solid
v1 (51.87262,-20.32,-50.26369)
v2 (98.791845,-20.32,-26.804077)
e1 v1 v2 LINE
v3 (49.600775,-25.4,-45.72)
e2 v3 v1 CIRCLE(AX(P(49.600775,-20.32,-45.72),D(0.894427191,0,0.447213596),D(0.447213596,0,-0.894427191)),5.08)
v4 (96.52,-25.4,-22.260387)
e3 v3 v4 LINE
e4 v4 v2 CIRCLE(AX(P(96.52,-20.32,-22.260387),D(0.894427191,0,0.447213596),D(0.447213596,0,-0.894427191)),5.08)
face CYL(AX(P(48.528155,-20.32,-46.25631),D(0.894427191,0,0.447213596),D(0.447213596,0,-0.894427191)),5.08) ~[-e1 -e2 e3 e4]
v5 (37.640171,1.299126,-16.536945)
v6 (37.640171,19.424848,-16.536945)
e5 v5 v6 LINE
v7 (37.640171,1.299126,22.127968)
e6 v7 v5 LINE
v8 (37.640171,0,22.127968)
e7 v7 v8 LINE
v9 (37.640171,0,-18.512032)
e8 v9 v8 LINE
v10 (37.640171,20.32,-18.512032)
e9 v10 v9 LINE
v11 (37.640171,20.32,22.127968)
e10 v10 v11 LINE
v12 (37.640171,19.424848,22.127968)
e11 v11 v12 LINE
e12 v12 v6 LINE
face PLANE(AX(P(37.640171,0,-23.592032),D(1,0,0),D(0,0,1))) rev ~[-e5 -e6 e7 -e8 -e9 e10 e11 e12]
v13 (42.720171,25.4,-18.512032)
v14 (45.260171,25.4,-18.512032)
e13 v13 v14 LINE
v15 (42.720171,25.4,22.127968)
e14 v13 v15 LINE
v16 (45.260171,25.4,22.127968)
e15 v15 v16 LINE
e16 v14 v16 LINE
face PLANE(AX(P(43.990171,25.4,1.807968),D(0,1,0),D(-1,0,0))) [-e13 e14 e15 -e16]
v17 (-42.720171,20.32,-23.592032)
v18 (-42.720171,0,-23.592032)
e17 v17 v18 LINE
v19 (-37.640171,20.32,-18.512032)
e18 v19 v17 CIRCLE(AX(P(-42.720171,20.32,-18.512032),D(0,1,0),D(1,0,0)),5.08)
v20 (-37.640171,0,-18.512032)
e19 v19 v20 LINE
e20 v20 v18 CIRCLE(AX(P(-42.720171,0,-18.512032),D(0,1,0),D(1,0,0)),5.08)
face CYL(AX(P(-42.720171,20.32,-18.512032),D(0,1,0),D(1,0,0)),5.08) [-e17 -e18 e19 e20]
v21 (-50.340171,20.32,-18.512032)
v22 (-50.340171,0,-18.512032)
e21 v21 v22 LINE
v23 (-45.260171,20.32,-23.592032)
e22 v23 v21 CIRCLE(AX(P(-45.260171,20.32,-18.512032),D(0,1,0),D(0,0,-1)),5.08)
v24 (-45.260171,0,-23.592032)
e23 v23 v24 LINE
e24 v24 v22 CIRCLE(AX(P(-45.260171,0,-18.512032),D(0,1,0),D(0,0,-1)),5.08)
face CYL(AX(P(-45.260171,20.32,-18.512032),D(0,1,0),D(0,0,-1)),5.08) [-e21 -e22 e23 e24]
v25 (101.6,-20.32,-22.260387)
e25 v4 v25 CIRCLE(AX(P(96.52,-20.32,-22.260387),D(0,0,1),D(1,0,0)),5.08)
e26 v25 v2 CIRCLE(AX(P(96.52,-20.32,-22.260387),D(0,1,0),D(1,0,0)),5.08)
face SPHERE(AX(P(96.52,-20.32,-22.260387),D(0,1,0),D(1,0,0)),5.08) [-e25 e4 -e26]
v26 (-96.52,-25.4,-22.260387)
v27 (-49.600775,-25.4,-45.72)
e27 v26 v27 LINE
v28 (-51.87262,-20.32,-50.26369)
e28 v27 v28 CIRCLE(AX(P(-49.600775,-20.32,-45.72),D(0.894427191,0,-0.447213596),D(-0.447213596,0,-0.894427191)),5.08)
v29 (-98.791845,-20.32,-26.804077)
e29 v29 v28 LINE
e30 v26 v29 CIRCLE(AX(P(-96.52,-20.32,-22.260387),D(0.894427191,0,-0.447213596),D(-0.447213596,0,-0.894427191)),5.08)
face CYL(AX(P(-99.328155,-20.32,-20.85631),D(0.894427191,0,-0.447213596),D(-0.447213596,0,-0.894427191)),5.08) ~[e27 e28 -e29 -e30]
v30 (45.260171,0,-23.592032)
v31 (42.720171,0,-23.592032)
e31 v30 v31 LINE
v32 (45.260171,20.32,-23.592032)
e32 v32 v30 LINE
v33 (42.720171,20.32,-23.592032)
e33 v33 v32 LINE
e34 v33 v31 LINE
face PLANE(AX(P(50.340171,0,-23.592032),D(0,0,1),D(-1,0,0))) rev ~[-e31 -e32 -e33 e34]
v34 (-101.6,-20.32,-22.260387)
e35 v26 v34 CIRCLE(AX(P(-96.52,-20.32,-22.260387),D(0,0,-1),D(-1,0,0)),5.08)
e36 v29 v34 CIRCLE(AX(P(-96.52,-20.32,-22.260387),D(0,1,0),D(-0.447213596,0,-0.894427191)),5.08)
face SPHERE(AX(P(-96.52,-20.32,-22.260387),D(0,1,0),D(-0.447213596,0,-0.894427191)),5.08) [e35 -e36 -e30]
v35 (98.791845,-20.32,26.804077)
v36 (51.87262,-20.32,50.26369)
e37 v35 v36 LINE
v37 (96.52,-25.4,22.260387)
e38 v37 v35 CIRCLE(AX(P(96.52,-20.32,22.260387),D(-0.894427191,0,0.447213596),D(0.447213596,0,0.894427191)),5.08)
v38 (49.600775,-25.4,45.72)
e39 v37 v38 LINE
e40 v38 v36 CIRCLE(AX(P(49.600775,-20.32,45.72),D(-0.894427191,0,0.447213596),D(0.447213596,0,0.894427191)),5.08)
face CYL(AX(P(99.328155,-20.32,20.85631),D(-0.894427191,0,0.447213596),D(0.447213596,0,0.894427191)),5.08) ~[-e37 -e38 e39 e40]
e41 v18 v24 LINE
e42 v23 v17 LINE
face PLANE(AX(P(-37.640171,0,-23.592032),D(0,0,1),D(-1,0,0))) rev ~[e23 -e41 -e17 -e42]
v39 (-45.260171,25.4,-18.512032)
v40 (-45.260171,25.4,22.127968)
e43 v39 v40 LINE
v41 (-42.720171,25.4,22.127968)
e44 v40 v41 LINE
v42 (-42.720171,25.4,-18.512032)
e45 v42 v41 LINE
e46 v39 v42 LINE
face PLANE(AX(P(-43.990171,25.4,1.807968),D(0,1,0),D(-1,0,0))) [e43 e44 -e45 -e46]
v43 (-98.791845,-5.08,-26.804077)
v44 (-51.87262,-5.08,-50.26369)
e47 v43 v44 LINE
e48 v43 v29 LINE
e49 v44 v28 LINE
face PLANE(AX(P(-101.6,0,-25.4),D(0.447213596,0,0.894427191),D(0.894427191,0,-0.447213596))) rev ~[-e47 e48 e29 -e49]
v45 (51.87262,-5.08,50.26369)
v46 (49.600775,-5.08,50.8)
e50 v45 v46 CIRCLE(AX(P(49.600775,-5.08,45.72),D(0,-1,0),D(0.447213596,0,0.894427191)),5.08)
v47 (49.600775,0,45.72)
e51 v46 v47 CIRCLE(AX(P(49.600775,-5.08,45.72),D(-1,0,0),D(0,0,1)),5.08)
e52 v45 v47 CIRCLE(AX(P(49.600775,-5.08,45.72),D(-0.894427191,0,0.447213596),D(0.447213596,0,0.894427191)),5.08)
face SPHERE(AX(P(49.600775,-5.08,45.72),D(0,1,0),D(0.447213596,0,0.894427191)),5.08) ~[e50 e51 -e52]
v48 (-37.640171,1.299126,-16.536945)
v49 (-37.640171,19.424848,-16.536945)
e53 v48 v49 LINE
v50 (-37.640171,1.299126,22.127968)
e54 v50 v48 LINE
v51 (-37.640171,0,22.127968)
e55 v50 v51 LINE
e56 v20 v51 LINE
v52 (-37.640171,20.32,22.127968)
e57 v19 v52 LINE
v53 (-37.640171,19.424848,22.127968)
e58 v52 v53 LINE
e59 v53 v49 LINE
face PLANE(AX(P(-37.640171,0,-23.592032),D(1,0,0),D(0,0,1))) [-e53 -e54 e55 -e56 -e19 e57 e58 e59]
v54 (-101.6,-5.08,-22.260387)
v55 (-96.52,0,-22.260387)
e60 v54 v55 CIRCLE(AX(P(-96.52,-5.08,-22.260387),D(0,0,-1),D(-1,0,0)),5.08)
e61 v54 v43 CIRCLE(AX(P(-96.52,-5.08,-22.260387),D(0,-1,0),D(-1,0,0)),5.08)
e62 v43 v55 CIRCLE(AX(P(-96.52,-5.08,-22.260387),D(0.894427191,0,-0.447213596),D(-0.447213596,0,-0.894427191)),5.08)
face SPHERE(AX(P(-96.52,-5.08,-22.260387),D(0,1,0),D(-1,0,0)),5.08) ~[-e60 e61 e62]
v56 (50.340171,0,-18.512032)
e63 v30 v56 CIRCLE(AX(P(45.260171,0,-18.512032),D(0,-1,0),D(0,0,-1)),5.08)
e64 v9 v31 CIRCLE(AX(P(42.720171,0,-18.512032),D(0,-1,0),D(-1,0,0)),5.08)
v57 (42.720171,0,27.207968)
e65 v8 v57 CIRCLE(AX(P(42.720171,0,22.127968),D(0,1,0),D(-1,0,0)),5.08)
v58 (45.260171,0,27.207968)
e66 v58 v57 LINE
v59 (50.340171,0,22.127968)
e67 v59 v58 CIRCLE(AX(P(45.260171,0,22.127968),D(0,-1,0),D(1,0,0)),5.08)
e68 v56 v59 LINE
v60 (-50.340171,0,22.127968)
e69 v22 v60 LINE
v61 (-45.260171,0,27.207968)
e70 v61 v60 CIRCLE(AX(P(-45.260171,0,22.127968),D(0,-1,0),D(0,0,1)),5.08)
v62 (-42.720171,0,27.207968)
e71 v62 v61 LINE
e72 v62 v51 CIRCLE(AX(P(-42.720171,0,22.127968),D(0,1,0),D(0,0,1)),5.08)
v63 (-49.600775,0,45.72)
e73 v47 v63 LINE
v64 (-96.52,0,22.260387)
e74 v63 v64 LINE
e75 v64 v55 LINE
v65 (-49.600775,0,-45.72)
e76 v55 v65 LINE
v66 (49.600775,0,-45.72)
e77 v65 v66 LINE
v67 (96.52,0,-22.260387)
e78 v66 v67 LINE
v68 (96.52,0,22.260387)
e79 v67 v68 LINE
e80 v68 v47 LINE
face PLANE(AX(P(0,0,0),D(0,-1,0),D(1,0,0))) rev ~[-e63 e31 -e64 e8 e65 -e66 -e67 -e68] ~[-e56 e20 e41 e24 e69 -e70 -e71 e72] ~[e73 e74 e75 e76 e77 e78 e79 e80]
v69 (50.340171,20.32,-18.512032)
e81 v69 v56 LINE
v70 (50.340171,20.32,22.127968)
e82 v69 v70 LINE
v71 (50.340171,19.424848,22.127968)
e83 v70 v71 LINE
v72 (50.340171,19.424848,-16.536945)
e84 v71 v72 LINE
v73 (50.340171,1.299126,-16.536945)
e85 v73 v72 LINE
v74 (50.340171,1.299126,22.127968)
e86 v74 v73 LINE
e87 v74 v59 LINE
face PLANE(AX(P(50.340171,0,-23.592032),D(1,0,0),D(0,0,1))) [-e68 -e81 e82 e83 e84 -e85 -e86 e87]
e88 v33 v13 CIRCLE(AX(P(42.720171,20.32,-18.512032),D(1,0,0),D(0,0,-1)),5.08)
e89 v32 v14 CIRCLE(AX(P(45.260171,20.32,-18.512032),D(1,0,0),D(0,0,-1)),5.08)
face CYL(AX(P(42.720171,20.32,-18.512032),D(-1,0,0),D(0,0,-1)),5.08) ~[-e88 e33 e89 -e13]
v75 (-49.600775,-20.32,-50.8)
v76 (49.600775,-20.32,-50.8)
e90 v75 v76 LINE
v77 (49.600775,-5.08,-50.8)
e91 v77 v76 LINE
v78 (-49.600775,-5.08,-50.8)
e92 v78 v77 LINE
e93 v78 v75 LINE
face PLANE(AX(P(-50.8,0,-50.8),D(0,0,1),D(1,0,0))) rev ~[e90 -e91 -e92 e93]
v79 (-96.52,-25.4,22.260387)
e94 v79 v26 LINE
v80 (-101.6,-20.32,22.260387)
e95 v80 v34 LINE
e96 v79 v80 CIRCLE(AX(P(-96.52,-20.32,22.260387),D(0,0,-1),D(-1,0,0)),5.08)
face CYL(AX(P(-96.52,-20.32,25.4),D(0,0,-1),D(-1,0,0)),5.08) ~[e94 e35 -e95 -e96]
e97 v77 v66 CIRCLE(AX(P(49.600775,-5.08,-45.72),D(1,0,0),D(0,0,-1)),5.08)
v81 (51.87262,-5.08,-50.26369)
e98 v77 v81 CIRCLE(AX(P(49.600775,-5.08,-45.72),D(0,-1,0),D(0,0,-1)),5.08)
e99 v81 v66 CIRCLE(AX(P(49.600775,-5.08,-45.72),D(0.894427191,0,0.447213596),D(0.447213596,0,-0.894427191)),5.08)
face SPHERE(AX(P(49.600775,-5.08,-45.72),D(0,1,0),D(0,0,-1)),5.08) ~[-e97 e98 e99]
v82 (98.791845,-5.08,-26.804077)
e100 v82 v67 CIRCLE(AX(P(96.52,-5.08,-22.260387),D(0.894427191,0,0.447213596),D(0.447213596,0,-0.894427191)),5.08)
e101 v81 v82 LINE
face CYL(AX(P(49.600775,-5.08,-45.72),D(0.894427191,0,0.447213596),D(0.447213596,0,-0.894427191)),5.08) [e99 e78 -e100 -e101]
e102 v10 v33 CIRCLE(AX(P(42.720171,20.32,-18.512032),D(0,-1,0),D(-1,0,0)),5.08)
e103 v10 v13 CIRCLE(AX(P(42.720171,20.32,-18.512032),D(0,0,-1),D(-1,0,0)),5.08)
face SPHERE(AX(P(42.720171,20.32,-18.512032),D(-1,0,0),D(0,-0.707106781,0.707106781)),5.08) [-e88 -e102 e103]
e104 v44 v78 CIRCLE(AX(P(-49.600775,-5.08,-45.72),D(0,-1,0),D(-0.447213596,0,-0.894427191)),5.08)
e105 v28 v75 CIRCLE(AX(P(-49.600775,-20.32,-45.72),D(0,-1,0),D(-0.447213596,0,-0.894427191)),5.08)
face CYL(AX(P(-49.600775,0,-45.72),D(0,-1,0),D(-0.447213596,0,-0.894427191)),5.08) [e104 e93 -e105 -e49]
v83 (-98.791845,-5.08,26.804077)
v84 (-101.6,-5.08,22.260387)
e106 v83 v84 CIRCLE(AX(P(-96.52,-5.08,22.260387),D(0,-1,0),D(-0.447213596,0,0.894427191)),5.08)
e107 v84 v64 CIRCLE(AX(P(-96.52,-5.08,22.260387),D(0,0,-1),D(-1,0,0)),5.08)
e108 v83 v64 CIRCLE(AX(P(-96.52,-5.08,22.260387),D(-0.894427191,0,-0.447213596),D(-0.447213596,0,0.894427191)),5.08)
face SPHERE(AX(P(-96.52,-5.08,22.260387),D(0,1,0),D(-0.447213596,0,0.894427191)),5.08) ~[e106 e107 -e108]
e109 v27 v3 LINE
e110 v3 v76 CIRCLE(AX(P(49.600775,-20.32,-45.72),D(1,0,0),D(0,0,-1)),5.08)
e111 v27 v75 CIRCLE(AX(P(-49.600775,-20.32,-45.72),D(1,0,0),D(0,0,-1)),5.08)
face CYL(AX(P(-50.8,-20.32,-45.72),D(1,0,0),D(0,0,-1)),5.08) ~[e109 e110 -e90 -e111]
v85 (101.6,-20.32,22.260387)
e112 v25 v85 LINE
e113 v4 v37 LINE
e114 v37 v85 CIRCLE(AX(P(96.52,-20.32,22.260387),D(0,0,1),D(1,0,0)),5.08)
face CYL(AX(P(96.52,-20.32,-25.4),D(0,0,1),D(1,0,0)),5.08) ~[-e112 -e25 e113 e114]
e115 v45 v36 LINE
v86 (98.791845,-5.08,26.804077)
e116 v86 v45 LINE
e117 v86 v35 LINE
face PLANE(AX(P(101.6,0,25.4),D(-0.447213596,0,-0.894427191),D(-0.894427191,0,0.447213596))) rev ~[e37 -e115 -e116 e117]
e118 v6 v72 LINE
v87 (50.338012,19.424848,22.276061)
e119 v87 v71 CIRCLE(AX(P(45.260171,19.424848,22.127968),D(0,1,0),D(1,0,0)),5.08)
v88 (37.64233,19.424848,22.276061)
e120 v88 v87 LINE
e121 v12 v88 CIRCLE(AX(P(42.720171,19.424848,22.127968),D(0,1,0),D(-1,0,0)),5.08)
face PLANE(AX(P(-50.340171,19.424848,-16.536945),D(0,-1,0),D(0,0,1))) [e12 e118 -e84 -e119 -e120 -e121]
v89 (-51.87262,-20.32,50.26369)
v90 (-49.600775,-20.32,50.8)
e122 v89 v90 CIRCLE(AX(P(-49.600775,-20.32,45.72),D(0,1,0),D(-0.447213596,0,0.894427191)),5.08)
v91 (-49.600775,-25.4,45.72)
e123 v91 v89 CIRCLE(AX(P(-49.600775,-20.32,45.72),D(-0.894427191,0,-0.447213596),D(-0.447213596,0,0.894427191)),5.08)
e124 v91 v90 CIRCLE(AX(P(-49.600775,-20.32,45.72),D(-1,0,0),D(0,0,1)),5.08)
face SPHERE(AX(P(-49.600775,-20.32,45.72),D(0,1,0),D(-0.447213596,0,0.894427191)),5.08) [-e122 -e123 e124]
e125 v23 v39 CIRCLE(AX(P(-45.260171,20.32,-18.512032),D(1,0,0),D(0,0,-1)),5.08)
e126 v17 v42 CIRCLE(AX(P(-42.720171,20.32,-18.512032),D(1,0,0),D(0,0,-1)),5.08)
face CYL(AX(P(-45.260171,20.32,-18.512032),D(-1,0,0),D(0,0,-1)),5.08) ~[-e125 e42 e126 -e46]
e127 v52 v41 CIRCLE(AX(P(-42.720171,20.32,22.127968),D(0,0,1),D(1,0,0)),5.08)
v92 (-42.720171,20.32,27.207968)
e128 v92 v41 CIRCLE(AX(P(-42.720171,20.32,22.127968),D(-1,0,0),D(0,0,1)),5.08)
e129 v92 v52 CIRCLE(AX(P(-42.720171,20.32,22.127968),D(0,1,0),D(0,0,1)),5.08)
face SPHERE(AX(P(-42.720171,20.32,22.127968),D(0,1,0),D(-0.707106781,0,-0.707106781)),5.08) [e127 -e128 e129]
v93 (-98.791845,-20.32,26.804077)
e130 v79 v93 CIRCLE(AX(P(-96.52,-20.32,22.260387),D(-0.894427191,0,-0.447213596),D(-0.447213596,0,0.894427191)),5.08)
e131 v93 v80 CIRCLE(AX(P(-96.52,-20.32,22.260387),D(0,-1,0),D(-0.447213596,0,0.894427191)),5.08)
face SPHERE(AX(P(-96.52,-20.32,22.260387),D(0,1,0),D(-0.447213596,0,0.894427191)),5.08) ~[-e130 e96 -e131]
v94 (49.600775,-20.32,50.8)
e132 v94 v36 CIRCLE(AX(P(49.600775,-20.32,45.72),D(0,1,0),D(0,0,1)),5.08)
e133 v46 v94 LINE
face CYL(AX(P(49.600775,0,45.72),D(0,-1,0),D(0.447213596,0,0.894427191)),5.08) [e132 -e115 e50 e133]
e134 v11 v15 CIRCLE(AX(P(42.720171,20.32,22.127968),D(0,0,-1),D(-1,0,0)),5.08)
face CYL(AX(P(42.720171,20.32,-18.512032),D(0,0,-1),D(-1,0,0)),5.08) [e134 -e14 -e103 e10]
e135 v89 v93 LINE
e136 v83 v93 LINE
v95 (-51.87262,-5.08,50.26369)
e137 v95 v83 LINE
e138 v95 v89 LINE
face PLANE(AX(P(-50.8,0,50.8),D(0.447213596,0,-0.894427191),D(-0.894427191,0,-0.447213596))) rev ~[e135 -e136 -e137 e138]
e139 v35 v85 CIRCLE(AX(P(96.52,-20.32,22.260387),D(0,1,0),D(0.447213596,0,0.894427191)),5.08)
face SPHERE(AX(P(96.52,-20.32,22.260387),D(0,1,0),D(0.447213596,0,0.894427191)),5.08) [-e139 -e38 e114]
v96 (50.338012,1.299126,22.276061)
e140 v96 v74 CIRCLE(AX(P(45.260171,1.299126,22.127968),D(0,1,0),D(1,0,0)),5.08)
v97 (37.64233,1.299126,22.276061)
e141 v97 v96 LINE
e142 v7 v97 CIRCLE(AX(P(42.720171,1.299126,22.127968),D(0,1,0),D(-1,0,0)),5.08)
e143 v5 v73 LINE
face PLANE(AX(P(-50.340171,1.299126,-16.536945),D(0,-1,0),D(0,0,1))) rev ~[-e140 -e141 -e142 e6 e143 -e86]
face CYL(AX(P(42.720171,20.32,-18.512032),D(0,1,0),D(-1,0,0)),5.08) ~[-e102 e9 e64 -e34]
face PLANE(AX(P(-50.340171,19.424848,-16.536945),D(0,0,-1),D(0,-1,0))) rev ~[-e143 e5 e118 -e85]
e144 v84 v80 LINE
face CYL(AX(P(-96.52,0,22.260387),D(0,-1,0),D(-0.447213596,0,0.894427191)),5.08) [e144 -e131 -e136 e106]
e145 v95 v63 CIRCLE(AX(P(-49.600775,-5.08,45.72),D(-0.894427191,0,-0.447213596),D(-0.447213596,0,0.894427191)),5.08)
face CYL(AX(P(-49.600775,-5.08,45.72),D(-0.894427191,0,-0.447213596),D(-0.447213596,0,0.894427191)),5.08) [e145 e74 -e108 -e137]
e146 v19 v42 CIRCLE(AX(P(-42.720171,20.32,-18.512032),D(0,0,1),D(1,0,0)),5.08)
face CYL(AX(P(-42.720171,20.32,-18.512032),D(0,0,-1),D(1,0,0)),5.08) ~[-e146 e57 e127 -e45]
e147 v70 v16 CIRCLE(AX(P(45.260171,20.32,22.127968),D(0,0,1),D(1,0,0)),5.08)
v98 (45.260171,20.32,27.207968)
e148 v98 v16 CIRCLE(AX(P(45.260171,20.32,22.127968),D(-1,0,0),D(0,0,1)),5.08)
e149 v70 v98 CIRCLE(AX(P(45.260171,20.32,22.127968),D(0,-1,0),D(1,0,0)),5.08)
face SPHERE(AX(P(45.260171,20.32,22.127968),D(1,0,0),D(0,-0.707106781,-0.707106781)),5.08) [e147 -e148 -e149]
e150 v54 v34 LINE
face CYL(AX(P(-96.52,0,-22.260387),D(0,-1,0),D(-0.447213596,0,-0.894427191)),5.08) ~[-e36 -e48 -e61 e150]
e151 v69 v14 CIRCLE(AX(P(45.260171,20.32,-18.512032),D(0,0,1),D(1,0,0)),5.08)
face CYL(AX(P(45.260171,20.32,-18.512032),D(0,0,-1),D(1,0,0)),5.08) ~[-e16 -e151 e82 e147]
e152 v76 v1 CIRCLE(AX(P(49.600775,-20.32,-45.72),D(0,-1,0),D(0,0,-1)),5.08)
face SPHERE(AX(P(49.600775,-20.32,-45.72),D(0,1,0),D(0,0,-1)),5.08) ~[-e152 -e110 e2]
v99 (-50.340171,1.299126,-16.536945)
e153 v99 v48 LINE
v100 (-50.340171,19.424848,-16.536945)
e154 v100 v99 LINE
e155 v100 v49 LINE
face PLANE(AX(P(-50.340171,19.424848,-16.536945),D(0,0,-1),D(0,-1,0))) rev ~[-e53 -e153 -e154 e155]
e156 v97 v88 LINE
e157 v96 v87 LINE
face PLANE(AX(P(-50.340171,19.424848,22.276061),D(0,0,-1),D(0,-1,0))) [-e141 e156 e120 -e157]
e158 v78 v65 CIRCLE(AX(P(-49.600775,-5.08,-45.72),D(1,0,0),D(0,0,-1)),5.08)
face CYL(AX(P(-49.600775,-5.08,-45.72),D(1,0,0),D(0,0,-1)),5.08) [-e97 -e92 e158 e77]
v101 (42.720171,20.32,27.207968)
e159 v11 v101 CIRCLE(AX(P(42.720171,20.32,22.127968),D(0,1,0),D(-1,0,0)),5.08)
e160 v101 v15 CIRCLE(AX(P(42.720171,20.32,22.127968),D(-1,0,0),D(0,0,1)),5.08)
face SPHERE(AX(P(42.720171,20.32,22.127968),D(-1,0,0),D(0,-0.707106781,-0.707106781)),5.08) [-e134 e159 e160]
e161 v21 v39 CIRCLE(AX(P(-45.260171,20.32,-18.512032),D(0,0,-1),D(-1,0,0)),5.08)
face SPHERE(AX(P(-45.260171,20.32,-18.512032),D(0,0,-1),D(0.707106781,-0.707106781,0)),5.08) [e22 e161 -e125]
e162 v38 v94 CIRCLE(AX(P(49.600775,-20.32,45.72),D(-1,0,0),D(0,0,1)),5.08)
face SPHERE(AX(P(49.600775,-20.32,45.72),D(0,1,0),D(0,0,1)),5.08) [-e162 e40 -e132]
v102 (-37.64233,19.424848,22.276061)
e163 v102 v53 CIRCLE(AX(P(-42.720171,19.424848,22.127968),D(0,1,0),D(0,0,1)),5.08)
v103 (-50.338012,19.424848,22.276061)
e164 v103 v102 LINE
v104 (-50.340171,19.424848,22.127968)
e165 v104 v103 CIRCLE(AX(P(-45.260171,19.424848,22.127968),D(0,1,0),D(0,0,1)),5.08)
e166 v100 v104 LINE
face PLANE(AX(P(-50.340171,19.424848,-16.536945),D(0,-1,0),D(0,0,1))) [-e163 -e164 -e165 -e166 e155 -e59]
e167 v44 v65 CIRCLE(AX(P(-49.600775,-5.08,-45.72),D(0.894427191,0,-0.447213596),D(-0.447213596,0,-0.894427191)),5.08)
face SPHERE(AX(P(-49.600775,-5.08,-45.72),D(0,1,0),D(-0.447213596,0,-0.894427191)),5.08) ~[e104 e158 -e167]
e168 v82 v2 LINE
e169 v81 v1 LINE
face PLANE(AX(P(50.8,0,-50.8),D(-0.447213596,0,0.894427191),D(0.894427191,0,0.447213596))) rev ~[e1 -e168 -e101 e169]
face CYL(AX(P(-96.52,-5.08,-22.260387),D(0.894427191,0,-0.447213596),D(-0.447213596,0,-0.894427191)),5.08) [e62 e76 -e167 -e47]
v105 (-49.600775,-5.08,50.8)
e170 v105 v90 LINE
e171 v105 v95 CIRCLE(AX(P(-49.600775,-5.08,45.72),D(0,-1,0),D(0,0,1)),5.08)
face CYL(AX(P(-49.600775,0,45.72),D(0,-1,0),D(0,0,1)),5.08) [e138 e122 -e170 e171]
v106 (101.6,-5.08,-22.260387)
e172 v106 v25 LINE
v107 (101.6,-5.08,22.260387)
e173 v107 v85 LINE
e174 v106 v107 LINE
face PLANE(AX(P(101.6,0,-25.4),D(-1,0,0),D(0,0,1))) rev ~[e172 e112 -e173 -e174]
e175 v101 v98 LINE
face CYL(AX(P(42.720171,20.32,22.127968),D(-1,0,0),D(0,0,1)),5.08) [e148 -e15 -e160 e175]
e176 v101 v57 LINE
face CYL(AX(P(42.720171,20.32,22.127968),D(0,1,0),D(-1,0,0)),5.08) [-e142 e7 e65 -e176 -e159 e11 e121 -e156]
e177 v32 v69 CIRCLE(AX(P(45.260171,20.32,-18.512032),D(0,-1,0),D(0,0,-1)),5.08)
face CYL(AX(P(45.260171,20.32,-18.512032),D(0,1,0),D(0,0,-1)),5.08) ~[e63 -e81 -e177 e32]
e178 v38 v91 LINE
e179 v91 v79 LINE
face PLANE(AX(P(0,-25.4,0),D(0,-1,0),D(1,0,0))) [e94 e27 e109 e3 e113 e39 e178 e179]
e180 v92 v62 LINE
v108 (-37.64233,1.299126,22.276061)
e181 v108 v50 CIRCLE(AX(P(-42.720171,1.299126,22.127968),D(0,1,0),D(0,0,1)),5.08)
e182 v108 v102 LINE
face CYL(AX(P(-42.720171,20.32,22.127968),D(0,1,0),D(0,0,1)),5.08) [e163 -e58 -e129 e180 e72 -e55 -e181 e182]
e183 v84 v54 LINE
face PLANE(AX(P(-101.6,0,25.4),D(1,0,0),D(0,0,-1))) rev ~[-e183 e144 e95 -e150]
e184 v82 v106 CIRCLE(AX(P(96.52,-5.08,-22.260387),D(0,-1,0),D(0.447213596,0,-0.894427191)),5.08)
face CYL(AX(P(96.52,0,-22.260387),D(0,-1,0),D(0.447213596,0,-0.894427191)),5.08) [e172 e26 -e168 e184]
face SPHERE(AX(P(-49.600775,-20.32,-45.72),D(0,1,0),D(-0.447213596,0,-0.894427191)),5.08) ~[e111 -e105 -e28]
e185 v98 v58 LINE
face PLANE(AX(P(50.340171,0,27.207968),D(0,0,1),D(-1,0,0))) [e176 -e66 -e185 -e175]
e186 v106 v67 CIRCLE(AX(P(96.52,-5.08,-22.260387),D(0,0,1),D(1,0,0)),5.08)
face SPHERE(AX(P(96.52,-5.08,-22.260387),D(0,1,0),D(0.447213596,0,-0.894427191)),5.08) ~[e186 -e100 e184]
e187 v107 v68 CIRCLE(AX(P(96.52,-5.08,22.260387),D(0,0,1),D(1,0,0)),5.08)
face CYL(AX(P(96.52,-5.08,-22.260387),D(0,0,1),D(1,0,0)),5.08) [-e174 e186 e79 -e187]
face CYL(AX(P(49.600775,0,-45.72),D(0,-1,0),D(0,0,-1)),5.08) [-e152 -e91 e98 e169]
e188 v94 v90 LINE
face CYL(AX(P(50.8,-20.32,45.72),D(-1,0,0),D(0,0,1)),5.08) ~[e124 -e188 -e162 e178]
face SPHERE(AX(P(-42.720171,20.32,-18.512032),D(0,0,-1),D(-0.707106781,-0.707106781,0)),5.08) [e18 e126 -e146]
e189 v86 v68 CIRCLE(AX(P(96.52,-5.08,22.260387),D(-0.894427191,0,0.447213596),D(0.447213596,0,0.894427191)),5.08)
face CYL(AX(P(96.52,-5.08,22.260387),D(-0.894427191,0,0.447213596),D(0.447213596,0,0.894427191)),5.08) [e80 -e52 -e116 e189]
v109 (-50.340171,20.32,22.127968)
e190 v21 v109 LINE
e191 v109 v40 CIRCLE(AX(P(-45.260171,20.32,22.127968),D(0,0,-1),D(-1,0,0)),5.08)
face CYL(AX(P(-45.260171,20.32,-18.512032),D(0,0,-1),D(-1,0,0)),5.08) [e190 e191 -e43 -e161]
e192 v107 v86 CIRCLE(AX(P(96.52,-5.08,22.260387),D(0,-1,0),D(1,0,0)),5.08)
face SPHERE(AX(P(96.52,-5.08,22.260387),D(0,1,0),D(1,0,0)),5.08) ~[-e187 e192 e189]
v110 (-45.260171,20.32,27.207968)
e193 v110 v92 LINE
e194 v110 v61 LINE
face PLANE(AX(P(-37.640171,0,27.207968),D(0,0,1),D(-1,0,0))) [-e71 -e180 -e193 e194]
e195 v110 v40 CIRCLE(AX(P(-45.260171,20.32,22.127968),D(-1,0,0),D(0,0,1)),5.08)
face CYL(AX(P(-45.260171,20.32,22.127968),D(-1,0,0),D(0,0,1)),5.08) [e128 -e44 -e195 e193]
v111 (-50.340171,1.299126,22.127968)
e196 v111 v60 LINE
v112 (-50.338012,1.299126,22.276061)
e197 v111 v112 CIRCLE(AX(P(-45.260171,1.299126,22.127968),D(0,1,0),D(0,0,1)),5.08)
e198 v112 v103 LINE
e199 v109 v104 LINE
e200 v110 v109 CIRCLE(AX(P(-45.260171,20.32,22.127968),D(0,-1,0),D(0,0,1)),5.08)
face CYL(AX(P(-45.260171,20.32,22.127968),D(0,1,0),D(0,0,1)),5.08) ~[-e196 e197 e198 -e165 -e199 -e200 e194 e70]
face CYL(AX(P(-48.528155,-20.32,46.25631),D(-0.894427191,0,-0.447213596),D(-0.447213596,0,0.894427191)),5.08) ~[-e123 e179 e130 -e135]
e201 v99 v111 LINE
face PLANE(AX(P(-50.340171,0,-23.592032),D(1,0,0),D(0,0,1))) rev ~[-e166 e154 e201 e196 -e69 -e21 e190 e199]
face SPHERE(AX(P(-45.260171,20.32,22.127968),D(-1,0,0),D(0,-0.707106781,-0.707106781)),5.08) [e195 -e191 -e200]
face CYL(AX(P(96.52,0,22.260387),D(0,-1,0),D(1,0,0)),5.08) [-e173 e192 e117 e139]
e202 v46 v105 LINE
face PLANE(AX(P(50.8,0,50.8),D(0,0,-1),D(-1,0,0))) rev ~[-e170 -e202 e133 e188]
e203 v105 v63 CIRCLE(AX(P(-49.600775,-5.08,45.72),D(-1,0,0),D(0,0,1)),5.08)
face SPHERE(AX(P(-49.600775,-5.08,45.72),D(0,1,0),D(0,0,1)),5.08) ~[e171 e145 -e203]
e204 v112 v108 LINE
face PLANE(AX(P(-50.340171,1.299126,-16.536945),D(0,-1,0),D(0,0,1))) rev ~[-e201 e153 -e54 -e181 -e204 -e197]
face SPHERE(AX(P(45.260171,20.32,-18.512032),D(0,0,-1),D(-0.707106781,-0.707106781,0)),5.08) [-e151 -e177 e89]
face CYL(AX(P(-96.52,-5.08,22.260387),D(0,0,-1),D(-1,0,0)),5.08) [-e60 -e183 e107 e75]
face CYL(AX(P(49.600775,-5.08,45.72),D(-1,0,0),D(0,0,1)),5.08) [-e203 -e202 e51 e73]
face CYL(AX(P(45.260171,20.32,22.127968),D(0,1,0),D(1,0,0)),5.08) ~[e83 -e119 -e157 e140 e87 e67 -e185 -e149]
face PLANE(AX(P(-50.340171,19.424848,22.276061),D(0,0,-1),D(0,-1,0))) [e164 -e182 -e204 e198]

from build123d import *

# Parameters (mm, degrees)
F1_DEPTH     = 25.4
F2_R         = 5.08
F3_R         = 5.08
F4_W         = 12.7
F4_H         = 50.8
F5_DEPTH     = 25.4
F6_W         = 18.1257220684
F6_H         = 38.8130061328
F7_DEPTH     = 254
F8_T1_DEPTH  = 2.54
F8_T3_DEPTH  = 40.64
F8_T5_DEPTH  = 20.32
F8_S9_W      = 5.08
F8_S9_H      = 5.08
F8_T10_DEPTH = 5.08
F8_S15_W     = 5.08
F8_S15_H     = 5.08
F8_T16_DEPTH = 5.08
F8_S21_W     = 5.08
F8_S21_H     = 5.08
F8_T22_DEPTH = 5.08
F8_S27_W     = 5.08
F8_S27_H     = 5.08
F8_T28_DEPTH = 5.08
F9_T1_DEPTH  = 40.64
F9_T3_DEPTH  = 2.54
F9_T5_DEPTH  = 20.32
F9_S9_W      = 5.08
F9_S9_H      = 5.08
F9_T10_DEPTH = 5.08
F9_S15_W     = 5.08
F9_S15_H     = 5.08
F9_T16_DEPTH = 5.08
F9_S21_W     = 5.08
F9_S21_H     = 5.08
F9_T22_DEPTH = 5.08
F9_S27_W     = 5.08
F9_S27_H     = 5.08
F9_T28_DEPTH = 5.08


# Not quite as in the source:
# - a fillet or chamfer that OpenCascade refuses, or shapes differently, is made with other operations: its cross-section is extruded or revolved along the edge and cut away or added


with BuildPart() as f1:
    # F0 (on Front) → F1 (new body)
    with BuildSketch(Plane.XZ):
        Polygon((-101.6, -25.4), (-50.8, -50.8), (50.8, -50.8), (101.6, -25.4), (101.6, 25.4), (50.8, 50.8), (-50.8, 50.8), (-101.6, 25.4), align=None)
    extrude(amount=F1_DEPTH)

    # F2
    f2_edges = [f1.edges().sort_by_distance(p)[0] for p in [
        (-76.2, -25.4, 38.1),
        (0, -25.4, 50.8),
        (76.2, -25.4, 38.1),
        (101.6, -25.4, 0),
        (-76.2, -25.4, -38.1),
        (0, -25.4, -50.8),
        (76.2, -25.4, -38.1),
        (-101.6, -25.4, 0),
        (-50.8, -12.7, -50.8),
        (-101.6, -12.7, -25.4),
        (-101.6, -12.7, 25.4),
        (-50.8, -12.7, 50.8),
        (50.8, -12.7, 50.8),
        (101.6, -12.7, 25.4),
        (101.6, -12.7, -25.4),
        (50.8, -12.7, -50.8),
    ]]
    fillet(f2_edges, radius=F2_R)

    # F3
    f3_edges = [f1.edges().sort_by_distance(p)[0] for p in [
        (-75.332232, 0, -38.533884),
        (-100.841306, 0, -24.931101),
        (-50.76792, 0, -50.664105),
        (-101.6, 0, 0),
        (0, 0, -50.8),
        (-100.841306, 0, 24.931101),
        (50.76792, 0, -50.664105),
        (-75.332232, 0, 38.533884),
        (75.332232, 0, -38.533884),
        (-50.76792, 0, 50.664105),
        (100.841306, 0, -24.931101),
        (0, 0, 50.8),
        (101.6, 0, 0),
        (50.76792, 0, 50.664105),
        (100.841306, 0, 24.931101),
        (75.332232, 0, 38.533884),
    ]]
    fillet(f3_edges, radius=F3_R)

    # F4 (on face) → F5 (join)
    with BuildSketch(Plane(origin=(0, 0, 0), x_dir=(-1, 0, 0), z_dir=(0, 1, 0))):
        with Locations((-43.9901705831, 1.8079679169)):
            Rectangle(F4_W, F4_H)
        with Locations((43.9901705831, 1.8079679169)):
            Rectangle(F4_W, F4_H)
    extrude(amount=F5_DEPTH)

    # F6 (on face) → F7 (cut)
    with BuildSketch(Plane(origin=(-50.3401705831, 0, 0), x_dir=(0, -1, 0), z_dir=(-1, 0, 0))):
        with Locations((-10.3619872243, 2.8695575893)):
            Rectangle(F6_W, F6_H)
    extrude(amount=-F7_DEPTH, mode=Mode.SUBTRACT)

    # F8: fillet of radius 5.08 on 8 edges, made by hand

    # F8_s2 → F8_t1 (cut)
    with BuildSketch(Plane.YZ.offset(42.7201705831)):
        with BuildLine():
            ThreePointArc((20.32, 27.2079679169), (23.9121024484, 25.7200703653), (25.4, 22.1279679169))
            Line((25.4, 22.1279679169), (25.4, 27.2079679169))
            Line((25.4, 27.2079679169), (20.32, 27.2079679169))
        make_face()
        with BuildLine():
            ThreePointArc((20.32, -23.5920320831), (23.9121024484, -22.1041345315), (25.4, -18.5120320831))
            Line((25.4, -18.5120320831), (25.4, -23.5920320831))
            Line((25.4, -23.5920320831), (20.32, -23.5920320831))
        make_face()
    extrude(amount=F8_T1_DEPTH, mode=Mode.SUBTRACT)

    # F8_s4 → F8_t3 (cut)
    with BuildSketch(Plane.XY.offset(-18.5120320831)):
        with BuildLine():
            ThreePointArc((50.3401705831, 20.32), (48.8522730316, 23.9121024484), (45.2601705831, 25.4))
            Line((45.2601705831, 25.4), (50.3401705831, 25.4))
            Line((50.3401705831, 25.4), (50.3401705831, 20.32))
        make_face()
        with BuildLine():
            ThreePointArc((37.6401705831, 20.32), (39.1280681347, 23.9121024484), (42.7201705831, 25.4))
            Line((42.7201705831, 25.4), (37.6401705831, 25.4))
            Line((37.6401705831, 25.4), (37.6401705831, 20.32))
        make_face()
    extrude(amount=F8_T3_DEPTH, mode=Mode.SUBTRACT)

    # F8_s6 → F8_t5 (cut)
    with BuildSketch(Plane.XZ.offset(-20.32)):
        with BuildLine():
            ThreePointArc((45.2601705831, -23.5920320831), (48.8522730316, -22.1041345315), (50.3401705831, -18.5120320831))
            Line((50.3401705831, -18.5120320831), (50.3401705831, -23.5920320831))
            Line((50.3401705831, -23.5920320831), (45.2601705831, -23.5920320831))
        make_face()
        with BuildLine():
            ThreePointArc((37.6401705831, -18.5120320831), (39.1280681347, -22.1041345315), (42.7201705831, -23.5920320831))
            Line((42.7201705831, -23.5920320831), (37.6401705831, -23.5920320831))
            Line((37.6401705831, -23.5920320831), (37.6401705831, -18.5120320831))
        make_face()
        with BuildLine():
            ThreePointArc((37.6401705831, 22.1279679169), (39.1280681347, 25.7200703653), (42.7201705831, 27.2079679169))
            Line((42.7201705831, 27.2079679169), (37.6401705831, 27.2079679169))
            Line((37.6401705831, 27.2079679169), (37.6401705831, 22.1279679169))
        make_face()
        with BuildLine():
            ThreePointArc((50.3401705831, 22.1279679169), (48.8522730316, 25.7200703653), (45.2601705831, 27.2079679169))
            Line((45.2601705831, 27.2079679169), (50.3401705831, 27.2079679169))
            Line((50.3401705831, 27.2079679169), (50.3401705831, 22.1279679169))
        make_face()
    extrude(amount=F8_T5_DEPTH, mode=Mode.SUBTRACT)


with BuildPart() as f8_tool8:
    # F8_s9 → F8_t10 (new body)
    with BuildSketch(Plane.YZ.offset(42.7201705831)):
        with Locations((22.86, 24.6679679169)):
            Rectangle(F8_S9_W, F8_S9_H)
    extrude(amount=-F8_T10_DEPTH)

    # F8_s11 → F8_t12 (revolve, cut)
    with BuildSketch(Plane(origin=(42.7201705831, 20.32, 22.1279679169), x_dir=(0, -0.7071067812, -0.7071067812), z_dir=(0, 0.7071067812, -0.7071067812))):
        with BuildLine():
            ThreePointArc((0, -5.08), (5.08, 0), (0, 5.08))
            Line((0, 5.08), (0, -5.08))
        make_face()
    revolve(axis=Axis((42.7201705831, 20.32, 22.1279679169), (-1, 0, 0)), mode=Mode.SUBTRACT)


with BuildPart() as f1_1:
    add(f1.part)

    # F8_t7: cut F8_tool8
    add(f8_tool8.part, mode=Mode.SUBTRACT)


with BuildPart() as f8_tool14:
    # F8_s15 → F8_t16 (new body)
    with BuildSketch(Plane.YZ.offset(45.2601705831)):
        with Locations((22.86, 24.6679679169)):
            Rectangle(F8_S15_W, F8_S15_H)
    extrude(amount=F8_T16_DEPTH)

    # F8_s17 → F8_t18 (revolve, cut)
    with BuildSketch(Plane(origin=(45.2601705831, 20.32, 22.1279679169), x_dir=(0, -0.7071067812, -0.7071067812), z_dir=(0, -0.7071067812, 0.7071067812))):
        with BuildLine():
            ThreePointArc((0, -5.08), (5.08, 0), (0, 5.08))
            Line((0, 5.08), (0, -5.08))
        make_face()
    revolve(axis=Axis((45.2601705831, 20.32, 22.1279679169), (1, 0, 0)), mode=Mode.SUBTRACT)


with BuildPart() as f1_2:
    add(f1_1.part)

    # F8_t13: cut F8_tool14
    add(f8_tool14.part, mode=Mode.SUBTRACT)


with BuildPart() as f8_tool20:
    # F8_s21 → F8_t22 (new body)
    with BuildSketch(Plane.XY.offset(-18.5120320831)):
        with Locations((47.8001705831, 22.86)):
            Rectangle(F8_S21_W, F8_S21_H)
    extrude(amount=-F8_T22_DEPTH)

    # F8_s23 → F8_t24 (revolve, cut)
    with BuildSketch(Plane(origin=(45.2601705831, 20.32, -18.5120320831), x_dir=(-0.7071067812, -0.7071067812, 0), z_dir=(0.7071067812, -0.7071067812, 0))):
        with BuildLine():
            ThreePointArc((0, -5.08), (5.08, 0), (0, 5.08))
            Line((0, 5.08), (0, -5.08))
        make_face()
    revolve(axis=Axis((45.2601705831, 20.32, -18.5120320831), (0, 0, -1)), mode=Mode.SUBTRACT)


with BuildPart() as f1_3:
    add(f1_2.part)

    # F8_t19: cut F8_tool20
    add(f8_tool20.part, mode=Mode.SUBTRACT)


with BuildPart() as f8_tool26:
    # F8_s27 → F8_t28 (new body)
    with BuildSketch(Plane.YZ.offset(42.7201705831)):
        with Locations((22.86, -21.0520320831)):
            Rectangle(F8_S27_W, F8_S27_H)
    extrude(amount=-F8_T28_DEPTH)

    # F8_s29 → F8_t30 (revolve, cut)
    with BuildSketch(Plane(origin=(42.7201705831, 20.32, -18.5120320831), x_dir=(0, -0.7071067812, 0.7071067812), z_dir=(0, -0.7071067812, -0.7071067812))):
        with BuildLine():
            ThreePointArc((0, -5.08), (5.08, 0), (0, 5.08))
            Line((0, 5.08), (0, -5.08))
        make_face()
    revolve(axis=Axis((42.7201705831, 20.32, -18.5120320831), (-1, 0, 0)), mode=Mode.SUBTRACT)


with BuildPart() as f1_4:
    add(f1_3.part)

    # F8_t25: cut F8_tool26
    add(f8_tool26.part, mode=Mode.SUBTRACT)

    # F9: fillet of radius 5.08 on 8 edges, made by hand

    # F9_s2 → F9_t1 (cut)
    with BuildSketch(Plane.XY.offset(-18.5120320831)):
        with BuildLine():
            ThreePointArc((-37.6401705831, 20.32), (-39.1280681347, 23.9121024484), (-42.7201705831, 25.4))
            Line((-42.7201705831, 25.4), (-37.6401705831, 25.4))
            Line((-37.6401705831, 25.4), (-37.6401705831, 20.32))
        make_face()
        with BuildLine():
            ThreePointArc((-50.3401705831, 20.32), (-48.8522730316, 23.9121024484), (-45.2601705831, 25.4))
            Line((-45.2601705831, 25.4), (-50.3401705831, 25.4))
            Line((-50.3401705831, 25.4), (-50.3401705831, 20.32))
        make_face()
    extrude(amount=F9_T1_DEPTH, mode=Mode.SUBTRACT)

    # F9_s4 → F9_t3 (cut)
    with BuildSketch(Plane.YZ.offset(-45.2601705831)):
        with BuildLine():
            ThreePointArc((20.32, -23.5920320831), (23.9121024484, -22.1041345315), (25.4, -18.5120320831))
            Line((25.4, -18.5120320831), (25.4, -23.5920320831))
            Line((25.4, -23.5920320831), (20.32, -23.5920320831))
        make_face()
        with BuildLine():
            ThreePointArc((20.32, 27.2079679169), (23.9121024484, 25.7200703653), (25.4, 22.1279679169))
            Line((25.4, 22.1279679169), (25.4, 27.2079679169))
            Line((25.4, 27.2079679169), (20.32, 27.2079679169))
        make_face()
    extrude(amount=F9_T3_DEPTH, mode=Mode.SUBTRACT)

    # F9_s6 → F9_t5 (cut)
    with BuildSketch(Plane.XZ.offset(-20.32)):
        with BuildLine():
            ThreePointArc((-37.6401705831, -18.5120320831), (-39.1280681347, -22.1041345315), (-42.7201705831, -23.5920320831))
            Line((-42.7201705831, -23.5920320831), (-37.6401705831, -23.5920320831))
            Line((-37.6401705831, -23.5920320831), (-37.6401705831, -18.5120320831))
        make_face()
        with BuildLine():
            ThreePointArc((-45.2601705831, -23.5920320831), (-48.8522730316, -22.1041345315), (-50.3401705831, -18.5120320831))
            Line((-50.3401705831, -18.5120320831), (-50.3401705831, -23.5920320831))
            Line((-50.3401705831, -23.5920320831), (-45.2601705831, -23.5920320831))
        make_face()
        with BuildLine():
            ThreePointArc((-42.7201705831, 27.2079679169), (-39.1280681347, 25.7200703653), (-37.6401705831, 22.1279679169))
            Line((-37.6401705831, 22.1279679169), (-37.6401705831, 27.2079679169))
            Line((-37.6401705831, 27.2079679169), (-42.7201705831, 27.2079679169))
        make_face()
        with BuildLine():
            ThreePointArc((-45.2601705831, 27.2079679169), (-48.8522730316, 25.7200703653), (-50.3401705831, 22.1279679169))
            Line((-50.3401705831, 22.1279679169), (-50.3401705831, 27.2079679169))
            Line((-50.3401705831, 27.2079679169), (-45.2601705831, 27.2079679169))
        make_face()
    extrude(amount=F9_T5_DEPTH, mode=Mode.SUBTRACT)


with BuildPart() as f9_tool8:
    # F9_s9 → F9_t10 (new body)
    with BuildSketch(Plane.XZ.offset(-20.32)):
        with Locations((-40.1801705831, 24.6679679169)):
            Rectangle(F9_S9_W, F9_S9_H)
    extrude(amount=-F9_T10_DEPTH)

    # F9_s11 → F9_t12 (revolve, cut)
    with BuildSketch(Plane(origin=(-42.7201705831, 20.32, 22.1279679169), x_dir=(-0.7071067812, 0, -0.7071067812), z_dir=(0.7071067812, 0, -0.7071067812))):
        with BuildLine():
            ThreePointArc((0, -5.08), (5.08, 0), (0, 5.08))
            Line((0, 5.08), (0, -5.08))
        make_face()
    revolve(axis=Axis((-42.7201705831, 20.32, 22.1279679169), (0, 1, 0)), mode=Mode.SUBTRACT)


with BuildPart() as f1_5:
    add(f1_4.part)

    # F9_t7: cut F9_tool8
    add(f9_tool8.part, mode=Mode.SUBTRACT)


with BuildPart() as f9_tool14:
    # F9_s15 → F9_t16 (new body)
    with BuildSketch(Plane.XY.offset(-18.5120320831)):
        with Locations((-40.1801705831, 22.86)):
            Rectangle(F9_S15_W, F9_S15_H)
    extrude(amount=-F9_T16_DEPTH)

    # F9_s17 → F9_t18 (revolve, cut)
    with BuildSketch(Plane(origin=(-42.7201705831, 20.32, -18.5120320831), x_dir=(-0.7071067812, -0.7071067812, 0), z_dir=(0.7071067812, -0.7071067812, 0))):
        with BuildLine():
            ThreePointArc((0, -5.08), (5.08, 0), (0, 5.08))
            Line((0, 5.08), (0, -5.08))
        make_face()
    revolve(axis=Axis((-42.7201705831, 20.32, -18.5120320831), (0, 0, -1)), mode=Mode.SUBTRACT)


with BuildPart() as f1_6:
    add(f1_5.part)

    # F9_t13: cut F9_tool14
    add(f9_tool14.part, mode=Mode.SUBTRACT)


with BuildPart() as f9_tool20:
    # F9_s21 → F9_t22 (new body)
    with BuildSketch(Plane.XY.offset(-18.5120320831)):
        with Locations((-47.8001705831, 22.86)):
            Rectangle(F9_S21_W, F9_S21_H)
    extrude(amount=-F9_T22_DEPTH)

    # F9_s23 → F9_t24 (revolve, cut)
    with BuildSketch(Plane(origin=(-45.2601705831, 20.32, -18.5120320831), x_dir=(0.7071067812, -0.7071067812, 0), z_dir=(0.7071067812, 0.7071067812, 0))):
        with BuildLine():
            ThreePointArc((0, -5.08), (5.08, 0), (0, 5.08))
            Line((0, 5.08), (0, -5.08))
        make_face()
    revolve(axis=Axis((-45.2601705831, 20.32, -18.5120320831), (0, 0, -1)), mode=Mode.SUBTRACT)


with BuildPart() as f1_7:
    add(f1_6.part)

    # F9_t19: cut F9_tool20
    add(f9_tool20.part, mode=Mode.SUBTRACT)


with BuildPart() as f9_tool26:
    # F9_s27 → F9_t28 (new body)
    with BuildSketch(Plane.YZ.offset(-45.2601705831)):
        with Locations((22.86, 24.6679679169)):
            Rectangle(F9_S27_W, F9_S27_H)
    extrude(amount=-F9_T28_DEPTH)

    # F9_s29 → F9_t30 (revolve, cut)
    with BuildSketch(Plane(origin=(-45.2601705831, 20.32, 22.1279679169), x_dir=(0, -0.7071067812, -0.7071067812), z_dir=(0, 0.7071067812, -0.7071067812))):
        with BuildLine():
            ThreePointArc((0, -5.08), (5.08, 0), (0, 5.08))
            Line((0, 5.08), (0, -5.08))
        make_face()
    revolve(axis=Axis((-45.2601705831, 20.32, 22.1279679169), (-1, 0, 0)), mode=Mode.SUBTRACT)


with BuildPart() as f1_8:
    add(f1_7.part)

    # F9_t25: cut F9_tool26
    add(f9_tool26.part, mode=Mode.SUBTRACT)


solid = f1_8.part
